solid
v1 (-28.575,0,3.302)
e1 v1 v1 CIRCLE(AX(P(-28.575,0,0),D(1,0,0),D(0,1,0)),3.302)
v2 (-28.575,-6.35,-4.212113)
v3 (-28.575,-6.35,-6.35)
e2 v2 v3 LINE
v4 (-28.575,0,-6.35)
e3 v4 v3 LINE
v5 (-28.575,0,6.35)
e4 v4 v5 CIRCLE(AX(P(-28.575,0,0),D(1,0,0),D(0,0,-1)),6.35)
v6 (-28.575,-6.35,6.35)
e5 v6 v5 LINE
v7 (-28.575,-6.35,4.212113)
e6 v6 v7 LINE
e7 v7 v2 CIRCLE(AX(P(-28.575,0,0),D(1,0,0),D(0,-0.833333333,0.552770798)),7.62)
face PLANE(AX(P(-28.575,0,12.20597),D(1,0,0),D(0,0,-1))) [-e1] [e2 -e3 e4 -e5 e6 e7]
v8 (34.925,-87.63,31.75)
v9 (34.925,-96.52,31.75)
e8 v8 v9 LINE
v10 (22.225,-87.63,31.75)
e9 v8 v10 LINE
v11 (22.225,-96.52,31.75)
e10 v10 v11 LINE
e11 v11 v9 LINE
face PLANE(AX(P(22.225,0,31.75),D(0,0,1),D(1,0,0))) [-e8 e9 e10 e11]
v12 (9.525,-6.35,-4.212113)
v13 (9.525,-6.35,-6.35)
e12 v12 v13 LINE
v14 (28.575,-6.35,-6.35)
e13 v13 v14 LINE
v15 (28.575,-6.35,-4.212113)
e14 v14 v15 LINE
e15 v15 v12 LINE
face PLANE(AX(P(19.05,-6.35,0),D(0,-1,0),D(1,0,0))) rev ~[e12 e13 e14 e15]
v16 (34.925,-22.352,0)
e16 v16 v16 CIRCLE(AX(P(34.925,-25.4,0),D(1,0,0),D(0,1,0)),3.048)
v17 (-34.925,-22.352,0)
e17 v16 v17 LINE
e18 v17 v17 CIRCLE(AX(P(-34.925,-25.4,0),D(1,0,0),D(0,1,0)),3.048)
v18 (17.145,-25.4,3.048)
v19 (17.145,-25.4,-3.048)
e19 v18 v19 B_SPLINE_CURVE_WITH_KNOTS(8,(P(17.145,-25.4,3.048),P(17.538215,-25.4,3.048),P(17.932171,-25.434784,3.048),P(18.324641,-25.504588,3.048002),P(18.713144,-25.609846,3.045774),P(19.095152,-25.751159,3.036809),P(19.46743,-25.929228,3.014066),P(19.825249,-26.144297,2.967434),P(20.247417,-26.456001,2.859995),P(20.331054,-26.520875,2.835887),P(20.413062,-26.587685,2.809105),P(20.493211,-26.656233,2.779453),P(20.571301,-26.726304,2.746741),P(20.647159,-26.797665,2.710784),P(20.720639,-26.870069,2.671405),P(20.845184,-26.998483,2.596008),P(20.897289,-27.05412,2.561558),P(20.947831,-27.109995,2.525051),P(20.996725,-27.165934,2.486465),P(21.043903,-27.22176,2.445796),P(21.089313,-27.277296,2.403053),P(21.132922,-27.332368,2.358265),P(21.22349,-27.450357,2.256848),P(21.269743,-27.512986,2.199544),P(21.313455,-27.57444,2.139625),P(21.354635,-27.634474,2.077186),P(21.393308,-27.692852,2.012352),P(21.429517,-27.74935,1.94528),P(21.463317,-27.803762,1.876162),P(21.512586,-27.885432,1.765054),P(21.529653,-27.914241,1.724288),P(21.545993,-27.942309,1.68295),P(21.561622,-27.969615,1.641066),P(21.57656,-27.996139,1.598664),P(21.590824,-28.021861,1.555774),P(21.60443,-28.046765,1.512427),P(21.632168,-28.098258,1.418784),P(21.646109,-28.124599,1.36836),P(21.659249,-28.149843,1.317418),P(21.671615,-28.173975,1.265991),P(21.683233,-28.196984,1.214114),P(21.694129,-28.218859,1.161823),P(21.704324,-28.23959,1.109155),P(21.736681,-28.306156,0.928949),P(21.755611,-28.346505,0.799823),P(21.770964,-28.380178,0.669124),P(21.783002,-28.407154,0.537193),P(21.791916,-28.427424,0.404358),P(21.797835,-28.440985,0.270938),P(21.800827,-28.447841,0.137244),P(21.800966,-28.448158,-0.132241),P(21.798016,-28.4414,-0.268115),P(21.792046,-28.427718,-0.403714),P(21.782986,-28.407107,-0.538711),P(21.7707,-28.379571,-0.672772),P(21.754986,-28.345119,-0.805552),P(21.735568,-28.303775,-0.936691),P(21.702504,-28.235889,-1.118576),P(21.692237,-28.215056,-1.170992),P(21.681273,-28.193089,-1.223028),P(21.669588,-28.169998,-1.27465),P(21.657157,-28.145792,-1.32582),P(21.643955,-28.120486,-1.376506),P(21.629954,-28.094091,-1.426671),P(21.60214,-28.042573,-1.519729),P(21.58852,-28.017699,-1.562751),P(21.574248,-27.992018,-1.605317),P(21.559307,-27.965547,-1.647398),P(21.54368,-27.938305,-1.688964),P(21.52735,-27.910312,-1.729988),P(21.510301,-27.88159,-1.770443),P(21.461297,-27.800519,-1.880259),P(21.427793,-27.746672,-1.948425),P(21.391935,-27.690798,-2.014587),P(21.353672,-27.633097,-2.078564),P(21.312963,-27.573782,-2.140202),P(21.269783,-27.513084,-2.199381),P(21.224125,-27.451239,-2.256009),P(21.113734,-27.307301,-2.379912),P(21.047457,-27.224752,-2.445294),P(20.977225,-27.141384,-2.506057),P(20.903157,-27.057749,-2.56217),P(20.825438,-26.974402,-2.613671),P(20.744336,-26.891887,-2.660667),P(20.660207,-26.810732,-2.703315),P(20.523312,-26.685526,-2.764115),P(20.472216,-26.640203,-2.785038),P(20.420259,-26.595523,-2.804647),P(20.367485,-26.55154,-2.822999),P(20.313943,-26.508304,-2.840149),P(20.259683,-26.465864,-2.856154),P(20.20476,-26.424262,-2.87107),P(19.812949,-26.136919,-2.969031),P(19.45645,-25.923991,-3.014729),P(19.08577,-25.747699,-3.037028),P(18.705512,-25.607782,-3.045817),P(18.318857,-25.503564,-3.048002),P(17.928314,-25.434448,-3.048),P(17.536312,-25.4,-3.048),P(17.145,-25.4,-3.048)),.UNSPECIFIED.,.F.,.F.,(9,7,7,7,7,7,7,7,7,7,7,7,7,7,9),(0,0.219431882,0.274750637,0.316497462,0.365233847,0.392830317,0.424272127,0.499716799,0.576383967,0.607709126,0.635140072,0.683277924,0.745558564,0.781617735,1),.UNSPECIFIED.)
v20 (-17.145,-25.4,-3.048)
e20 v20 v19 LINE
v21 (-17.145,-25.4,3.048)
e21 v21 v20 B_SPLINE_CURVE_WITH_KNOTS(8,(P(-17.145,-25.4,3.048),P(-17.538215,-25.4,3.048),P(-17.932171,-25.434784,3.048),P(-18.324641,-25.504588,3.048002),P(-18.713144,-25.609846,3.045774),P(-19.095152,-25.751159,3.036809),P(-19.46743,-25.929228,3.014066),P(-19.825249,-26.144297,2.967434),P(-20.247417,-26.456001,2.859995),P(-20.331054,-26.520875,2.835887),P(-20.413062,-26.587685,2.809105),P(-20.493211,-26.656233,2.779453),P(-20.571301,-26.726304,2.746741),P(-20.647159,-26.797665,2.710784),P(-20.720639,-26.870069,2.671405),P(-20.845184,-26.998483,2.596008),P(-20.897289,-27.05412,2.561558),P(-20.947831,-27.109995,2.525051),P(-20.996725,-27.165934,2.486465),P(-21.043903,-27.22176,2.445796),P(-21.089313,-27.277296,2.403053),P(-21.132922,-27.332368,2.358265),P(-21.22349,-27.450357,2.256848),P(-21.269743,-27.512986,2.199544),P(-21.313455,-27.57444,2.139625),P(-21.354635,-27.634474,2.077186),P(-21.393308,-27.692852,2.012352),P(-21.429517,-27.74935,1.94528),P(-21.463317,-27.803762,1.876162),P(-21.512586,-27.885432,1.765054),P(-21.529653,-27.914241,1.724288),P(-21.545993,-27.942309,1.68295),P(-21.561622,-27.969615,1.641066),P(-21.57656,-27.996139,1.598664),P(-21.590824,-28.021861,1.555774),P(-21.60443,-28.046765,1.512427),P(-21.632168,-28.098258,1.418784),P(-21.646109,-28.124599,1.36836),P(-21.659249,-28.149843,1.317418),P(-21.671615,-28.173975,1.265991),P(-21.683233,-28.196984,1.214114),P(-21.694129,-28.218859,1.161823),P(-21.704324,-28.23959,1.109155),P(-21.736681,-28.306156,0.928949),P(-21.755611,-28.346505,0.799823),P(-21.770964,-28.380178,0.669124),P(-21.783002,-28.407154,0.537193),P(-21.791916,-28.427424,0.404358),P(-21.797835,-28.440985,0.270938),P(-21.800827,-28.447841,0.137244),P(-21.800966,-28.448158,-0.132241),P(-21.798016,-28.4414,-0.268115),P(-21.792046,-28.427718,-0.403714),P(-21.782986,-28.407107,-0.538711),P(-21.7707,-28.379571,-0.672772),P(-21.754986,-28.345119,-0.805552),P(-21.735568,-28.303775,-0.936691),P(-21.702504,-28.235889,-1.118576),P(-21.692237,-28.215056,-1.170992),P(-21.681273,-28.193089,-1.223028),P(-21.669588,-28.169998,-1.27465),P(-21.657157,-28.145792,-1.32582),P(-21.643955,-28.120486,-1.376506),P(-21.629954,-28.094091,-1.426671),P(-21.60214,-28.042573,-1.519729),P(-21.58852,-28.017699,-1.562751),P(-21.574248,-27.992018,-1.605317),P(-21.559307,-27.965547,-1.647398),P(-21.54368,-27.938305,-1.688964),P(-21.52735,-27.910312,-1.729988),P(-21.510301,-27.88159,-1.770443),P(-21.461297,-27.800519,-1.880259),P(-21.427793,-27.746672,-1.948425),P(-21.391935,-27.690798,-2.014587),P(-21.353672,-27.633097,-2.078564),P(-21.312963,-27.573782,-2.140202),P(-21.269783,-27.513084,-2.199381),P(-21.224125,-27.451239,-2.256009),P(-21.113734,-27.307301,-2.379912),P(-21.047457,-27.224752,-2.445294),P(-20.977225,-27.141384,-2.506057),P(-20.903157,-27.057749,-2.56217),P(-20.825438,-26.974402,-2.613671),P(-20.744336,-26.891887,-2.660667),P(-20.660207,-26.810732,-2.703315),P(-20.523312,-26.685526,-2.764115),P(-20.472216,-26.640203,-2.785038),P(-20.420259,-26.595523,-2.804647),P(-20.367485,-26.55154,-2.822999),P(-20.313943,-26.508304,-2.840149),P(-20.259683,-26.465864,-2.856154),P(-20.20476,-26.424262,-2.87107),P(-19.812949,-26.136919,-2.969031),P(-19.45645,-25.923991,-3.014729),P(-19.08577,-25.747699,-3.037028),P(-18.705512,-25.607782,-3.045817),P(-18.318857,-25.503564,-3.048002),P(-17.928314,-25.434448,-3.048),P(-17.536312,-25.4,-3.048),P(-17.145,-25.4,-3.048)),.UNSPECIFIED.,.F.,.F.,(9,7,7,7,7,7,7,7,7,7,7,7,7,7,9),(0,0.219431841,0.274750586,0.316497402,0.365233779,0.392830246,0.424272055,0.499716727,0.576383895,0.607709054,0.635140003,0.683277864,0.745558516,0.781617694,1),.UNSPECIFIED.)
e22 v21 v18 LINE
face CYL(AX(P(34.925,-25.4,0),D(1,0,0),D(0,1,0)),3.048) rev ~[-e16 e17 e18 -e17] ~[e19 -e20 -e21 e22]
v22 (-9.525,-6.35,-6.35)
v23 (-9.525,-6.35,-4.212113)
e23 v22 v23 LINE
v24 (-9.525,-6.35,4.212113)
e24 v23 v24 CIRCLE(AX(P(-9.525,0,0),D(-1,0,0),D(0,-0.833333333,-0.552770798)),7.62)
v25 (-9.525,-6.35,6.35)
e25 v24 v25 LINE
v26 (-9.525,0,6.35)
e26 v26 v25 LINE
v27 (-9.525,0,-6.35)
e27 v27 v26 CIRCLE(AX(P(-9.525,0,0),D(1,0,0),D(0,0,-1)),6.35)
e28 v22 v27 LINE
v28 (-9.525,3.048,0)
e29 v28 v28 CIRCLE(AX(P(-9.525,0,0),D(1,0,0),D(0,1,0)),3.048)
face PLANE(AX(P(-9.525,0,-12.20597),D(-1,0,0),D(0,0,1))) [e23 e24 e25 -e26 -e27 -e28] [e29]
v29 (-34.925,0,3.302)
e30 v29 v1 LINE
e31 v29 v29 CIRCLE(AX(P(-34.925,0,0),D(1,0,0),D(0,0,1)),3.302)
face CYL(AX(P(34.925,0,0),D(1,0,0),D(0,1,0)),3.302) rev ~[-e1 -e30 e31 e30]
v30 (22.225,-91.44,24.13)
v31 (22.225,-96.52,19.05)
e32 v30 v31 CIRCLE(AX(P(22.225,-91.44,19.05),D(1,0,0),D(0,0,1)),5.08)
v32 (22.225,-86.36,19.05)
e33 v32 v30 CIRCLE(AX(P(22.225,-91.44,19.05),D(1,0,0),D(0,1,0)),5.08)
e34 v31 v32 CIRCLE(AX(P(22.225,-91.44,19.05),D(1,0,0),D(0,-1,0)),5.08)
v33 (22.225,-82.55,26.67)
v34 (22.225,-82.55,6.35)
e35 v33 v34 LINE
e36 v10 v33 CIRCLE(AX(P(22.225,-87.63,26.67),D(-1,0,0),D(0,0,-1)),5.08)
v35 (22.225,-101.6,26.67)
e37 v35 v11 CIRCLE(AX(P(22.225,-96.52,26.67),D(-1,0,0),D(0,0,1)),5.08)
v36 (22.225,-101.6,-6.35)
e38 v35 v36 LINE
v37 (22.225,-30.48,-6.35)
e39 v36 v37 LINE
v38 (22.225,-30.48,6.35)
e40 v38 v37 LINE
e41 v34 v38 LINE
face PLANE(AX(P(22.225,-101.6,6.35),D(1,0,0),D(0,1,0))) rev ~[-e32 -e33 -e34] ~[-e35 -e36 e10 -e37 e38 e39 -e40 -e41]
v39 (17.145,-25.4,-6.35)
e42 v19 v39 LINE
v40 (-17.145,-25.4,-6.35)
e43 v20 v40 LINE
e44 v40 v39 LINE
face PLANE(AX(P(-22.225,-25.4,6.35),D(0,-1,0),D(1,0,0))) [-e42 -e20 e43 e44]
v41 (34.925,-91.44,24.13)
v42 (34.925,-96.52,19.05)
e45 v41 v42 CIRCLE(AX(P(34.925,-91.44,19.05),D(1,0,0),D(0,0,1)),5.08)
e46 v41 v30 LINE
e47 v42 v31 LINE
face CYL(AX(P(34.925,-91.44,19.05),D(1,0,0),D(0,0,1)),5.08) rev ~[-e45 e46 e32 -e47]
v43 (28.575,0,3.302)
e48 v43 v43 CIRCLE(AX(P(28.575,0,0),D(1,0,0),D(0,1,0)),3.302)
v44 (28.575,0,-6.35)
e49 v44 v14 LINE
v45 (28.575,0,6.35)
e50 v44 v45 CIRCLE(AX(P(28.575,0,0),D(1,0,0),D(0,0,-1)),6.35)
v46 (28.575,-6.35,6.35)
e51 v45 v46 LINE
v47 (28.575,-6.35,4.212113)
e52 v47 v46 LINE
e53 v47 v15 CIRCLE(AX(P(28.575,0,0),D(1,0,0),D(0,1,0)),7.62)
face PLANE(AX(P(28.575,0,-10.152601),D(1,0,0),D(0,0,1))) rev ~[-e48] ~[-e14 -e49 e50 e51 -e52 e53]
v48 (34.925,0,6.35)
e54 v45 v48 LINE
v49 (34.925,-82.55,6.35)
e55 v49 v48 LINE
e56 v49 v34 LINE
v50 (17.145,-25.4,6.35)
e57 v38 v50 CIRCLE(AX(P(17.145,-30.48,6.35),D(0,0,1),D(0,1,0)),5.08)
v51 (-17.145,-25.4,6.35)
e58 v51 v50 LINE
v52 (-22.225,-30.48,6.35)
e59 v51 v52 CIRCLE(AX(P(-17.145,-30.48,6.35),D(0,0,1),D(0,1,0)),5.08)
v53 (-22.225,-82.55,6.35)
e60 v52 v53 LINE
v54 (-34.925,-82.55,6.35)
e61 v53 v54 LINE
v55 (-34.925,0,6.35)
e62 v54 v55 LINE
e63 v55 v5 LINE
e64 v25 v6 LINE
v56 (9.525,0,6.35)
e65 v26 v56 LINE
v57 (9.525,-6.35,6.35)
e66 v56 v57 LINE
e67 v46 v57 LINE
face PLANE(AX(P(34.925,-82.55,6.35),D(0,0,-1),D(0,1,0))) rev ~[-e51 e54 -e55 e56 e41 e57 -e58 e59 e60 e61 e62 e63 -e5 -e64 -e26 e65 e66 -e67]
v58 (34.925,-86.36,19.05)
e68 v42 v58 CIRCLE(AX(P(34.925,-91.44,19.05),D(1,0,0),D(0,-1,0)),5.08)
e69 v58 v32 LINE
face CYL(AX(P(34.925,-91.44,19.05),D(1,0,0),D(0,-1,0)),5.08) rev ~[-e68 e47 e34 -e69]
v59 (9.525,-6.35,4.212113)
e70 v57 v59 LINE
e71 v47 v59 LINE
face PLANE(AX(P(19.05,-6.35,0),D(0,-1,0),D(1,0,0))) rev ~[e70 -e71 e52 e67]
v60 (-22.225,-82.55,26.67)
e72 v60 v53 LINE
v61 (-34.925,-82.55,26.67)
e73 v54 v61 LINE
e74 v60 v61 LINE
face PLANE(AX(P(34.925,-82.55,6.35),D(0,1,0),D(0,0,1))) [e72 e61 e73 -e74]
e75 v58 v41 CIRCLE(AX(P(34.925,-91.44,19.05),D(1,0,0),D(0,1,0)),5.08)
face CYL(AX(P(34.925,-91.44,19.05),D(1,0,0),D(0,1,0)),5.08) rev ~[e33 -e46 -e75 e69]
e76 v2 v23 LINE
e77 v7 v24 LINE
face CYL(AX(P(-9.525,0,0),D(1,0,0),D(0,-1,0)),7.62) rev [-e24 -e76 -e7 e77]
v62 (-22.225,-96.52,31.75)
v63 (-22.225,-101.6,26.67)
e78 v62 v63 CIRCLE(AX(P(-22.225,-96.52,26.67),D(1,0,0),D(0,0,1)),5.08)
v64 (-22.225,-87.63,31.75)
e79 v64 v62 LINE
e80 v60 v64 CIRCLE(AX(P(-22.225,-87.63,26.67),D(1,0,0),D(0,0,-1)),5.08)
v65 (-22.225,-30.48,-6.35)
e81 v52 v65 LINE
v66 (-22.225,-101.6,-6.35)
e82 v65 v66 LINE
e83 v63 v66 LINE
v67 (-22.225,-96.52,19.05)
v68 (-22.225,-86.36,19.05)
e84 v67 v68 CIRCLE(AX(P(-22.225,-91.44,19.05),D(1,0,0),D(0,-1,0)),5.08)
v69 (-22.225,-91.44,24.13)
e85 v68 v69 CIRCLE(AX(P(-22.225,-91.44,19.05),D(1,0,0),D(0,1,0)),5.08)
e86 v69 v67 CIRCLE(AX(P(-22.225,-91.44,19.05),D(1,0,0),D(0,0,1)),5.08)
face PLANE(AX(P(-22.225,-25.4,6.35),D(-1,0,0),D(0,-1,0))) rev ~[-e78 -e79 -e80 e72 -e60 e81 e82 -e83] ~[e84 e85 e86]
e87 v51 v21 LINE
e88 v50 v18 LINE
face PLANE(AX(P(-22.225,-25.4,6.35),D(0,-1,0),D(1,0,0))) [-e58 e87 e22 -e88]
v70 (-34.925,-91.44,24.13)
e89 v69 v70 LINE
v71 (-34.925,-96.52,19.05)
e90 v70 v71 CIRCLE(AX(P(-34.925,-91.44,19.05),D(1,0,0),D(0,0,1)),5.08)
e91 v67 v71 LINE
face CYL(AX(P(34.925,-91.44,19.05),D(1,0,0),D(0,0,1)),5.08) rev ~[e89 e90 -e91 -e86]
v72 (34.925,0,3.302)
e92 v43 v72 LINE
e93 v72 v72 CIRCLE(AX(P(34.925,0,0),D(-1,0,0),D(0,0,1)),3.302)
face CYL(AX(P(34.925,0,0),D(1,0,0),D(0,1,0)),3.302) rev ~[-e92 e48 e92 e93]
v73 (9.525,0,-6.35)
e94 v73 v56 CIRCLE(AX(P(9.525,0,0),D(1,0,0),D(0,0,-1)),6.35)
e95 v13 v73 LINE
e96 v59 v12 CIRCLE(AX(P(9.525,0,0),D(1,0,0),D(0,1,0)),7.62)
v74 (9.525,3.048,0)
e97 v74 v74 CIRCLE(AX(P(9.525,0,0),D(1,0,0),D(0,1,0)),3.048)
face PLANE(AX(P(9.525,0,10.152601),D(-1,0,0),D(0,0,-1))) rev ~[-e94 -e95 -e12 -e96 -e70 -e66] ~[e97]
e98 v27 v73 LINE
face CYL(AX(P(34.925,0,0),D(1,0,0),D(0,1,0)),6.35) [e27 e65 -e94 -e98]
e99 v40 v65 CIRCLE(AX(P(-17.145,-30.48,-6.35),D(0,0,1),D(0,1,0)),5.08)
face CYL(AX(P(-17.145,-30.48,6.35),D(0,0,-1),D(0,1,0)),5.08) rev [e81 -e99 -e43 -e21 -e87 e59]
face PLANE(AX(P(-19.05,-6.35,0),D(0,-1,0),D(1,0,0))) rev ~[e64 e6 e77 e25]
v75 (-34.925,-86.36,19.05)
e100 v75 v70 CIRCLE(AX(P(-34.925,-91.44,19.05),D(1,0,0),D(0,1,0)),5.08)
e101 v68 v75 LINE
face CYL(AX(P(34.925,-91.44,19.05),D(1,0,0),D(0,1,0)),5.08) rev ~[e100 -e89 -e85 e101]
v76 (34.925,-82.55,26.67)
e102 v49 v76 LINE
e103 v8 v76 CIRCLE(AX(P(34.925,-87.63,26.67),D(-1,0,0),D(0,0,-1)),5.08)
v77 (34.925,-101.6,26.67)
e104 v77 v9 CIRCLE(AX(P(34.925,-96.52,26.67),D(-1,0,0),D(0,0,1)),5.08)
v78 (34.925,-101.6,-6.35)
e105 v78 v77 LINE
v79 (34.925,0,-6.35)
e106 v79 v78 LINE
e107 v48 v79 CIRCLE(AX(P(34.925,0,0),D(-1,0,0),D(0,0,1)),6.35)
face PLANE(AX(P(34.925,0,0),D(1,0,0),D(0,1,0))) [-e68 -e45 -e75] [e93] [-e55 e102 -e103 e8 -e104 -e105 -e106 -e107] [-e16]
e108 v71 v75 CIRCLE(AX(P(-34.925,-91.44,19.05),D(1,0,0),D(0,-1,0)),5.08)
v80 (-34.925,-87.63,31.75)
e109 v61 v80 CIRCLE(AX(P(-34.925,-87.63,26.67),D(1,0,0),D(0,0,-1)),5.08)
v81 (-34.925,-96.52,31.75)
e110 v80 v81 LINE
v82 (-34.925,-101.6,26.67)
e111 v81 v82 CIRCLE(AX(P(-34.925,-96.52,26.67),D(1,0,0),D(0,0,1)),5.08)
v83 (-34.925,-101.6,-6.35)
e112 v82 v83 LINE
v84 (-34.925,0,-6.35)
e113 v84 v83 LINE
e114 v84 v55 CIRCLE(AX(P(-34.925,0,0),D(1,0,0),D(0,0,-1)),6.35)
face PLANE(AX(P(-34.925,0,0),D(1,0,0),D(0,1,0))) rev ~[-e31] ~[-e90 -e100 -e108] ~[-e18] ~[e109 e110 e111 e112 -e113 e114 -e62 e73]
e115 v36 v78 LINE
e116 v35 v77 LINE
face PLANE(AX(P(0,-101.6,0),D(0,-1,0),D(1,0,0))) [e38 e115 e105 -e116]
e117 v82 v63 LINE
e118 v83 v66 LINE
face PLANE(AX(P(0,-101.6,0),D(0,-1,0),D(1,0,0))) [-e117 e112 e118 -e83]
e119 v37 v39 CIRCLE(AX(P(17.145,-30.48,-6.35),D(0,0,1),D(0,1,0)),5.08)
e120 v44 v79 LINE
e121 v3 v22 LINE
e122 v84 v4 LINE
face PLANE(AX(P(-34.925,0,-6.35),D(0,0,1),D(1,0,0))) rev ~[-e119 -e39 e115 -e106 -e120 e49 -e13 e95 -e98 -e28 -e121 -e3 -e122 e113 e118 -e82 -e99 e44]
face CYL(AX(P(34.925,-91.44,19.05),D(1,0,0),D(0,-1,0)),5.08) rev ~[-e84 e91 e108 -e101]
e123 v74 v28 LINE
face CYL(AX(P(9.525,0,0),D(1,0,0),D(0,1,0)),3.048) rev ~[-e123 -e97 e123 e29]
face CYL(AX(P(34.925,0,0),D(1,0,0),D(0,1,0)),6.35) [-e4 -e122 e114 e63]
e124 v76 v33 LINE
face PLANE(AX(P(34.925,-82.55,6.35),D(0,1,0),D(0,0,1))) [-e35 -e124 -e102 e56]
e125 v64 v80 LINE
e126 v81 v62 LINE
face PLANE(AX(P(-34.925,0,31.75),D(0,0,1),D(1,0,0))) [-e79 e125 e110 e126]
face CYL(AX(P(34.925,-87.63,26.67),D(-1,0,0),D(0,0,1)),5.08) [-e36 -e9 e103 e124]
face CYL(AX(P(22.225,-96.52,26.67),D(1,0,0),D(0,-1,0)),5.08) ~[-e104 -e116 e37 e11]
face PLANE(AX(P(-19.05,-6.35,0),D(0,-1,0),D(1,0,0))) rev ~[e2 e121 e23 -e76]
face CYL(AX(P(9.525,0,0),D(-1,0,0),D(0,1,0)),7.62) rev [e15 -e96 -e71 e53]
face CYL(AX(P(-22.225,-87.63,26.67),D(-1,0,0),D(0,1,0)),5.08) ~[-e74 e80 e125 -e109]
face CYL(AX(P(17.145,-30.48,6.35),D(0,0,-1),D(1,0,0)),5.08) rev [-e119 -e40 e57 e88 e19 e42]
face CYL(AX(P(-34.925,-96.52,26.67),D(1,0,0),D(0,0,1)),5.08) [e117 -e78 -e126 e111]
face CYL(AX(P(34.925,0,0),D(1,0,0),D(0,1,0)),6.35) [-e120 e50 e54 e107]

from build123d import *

# Parameters (mm, degrees)
F0_W      = 12.7
F0_H      = 25.4
F1_DEPTH  = 101.6
F2_W      = 82.55
F2_H      = 25.4
F3_DEPTH  = 69.851
F4_W      = 44.45
F4_H      = 50.8
F4_H_2    = 25.4
F5_DEPTH  = 25.4
F6_R      = 5.08
F7_R      = 6.35
F7_R_2    = 3.302
F8_DEPTH  = 69.85
F9_R      = 3.302
F10_DEPTH = 69.851
F12_DEPTH = 6.35
F13_R     = 4.8460610966
F13_R_2   = 3.048
F14_DEPTH = 19.05
F15_R     = 3.048
F16_DEPTH = 69.851
F18_R     = 7.62
F19_DEPTH = 19.05
F20_R     = 7.62
F21_DEPTH = 19.05


# Not quite as in the source:
# - two fillets or chamfers of one size are made in one step
# - a feature names something its author has since deleted; it is built from what else it names


with BuildPart() as f1:
    # F0 (on Front) → F1 (new body)
    with BuildSketch(Plane.XZ):
        Polygon((34.925, -6.35), (34.925, 6.35), (22.225, 6.35), (-22.225, 6.35), (-34.925, 6.35), (-34.925, -6.35), align=None)
        with Locations((28.575, 19.05)):
            Rectangle(F0_W, F0_H)
        with Locations((-28.575, 19.05)):
            Rectangle(F0_W, F0_H)
    extrude(amount=F1_DEPTH)

    # F2 (on face) → F3 (cut, through all)
    with BuildSketch(Plane.YZ.offset(34.925)):
        with Locations((-41.275, 19.05)):
            Rectangle(F2_W, F2_H)
        with BuildLine():
            ThreePointArc((-86.36, 19.05), (-87.8478975516, 22.6421024484), (-91.44, 24.13))
            Line((-91.44, 24.13), (-91.44, 19.05))
            Line((-91.44, 19.05), (-96.52, 19.05))
            ThreePointArc((-96.52, 19.05), (-91.44, 13.97), (-86.36, 19.05))
        make_face()
        with BuildLine():
            Line((-91.44, 19.05), (-91.44, 24.13))
            ThreePointArc((-91.44, 24.13), (-95.0321024484, 22.6421024484), (-96.52, 19.05))
            Line((-96.52, 19.05), (-91.44, 19.05))
        make_face()
    extrude(amount=-F3_DEPTH, mode=Mode.SUBTRACT)

    # F4 (on face) → F5 (cut)
    with BuildSketch(Plane.XY.offset(6.35)):
        with Locations((0, -50.8)):
            Rectangle(F4_W, F4_H)
        with Locations((0, -88.9)):
            Rectangle(F4_W, F4_H_2)
    extrude(amount=-F5_DEPTH, mode=Mode.SUBTRACT)

    # F6
    f6_edges = [f1.edges().sort_by_distance(p)[0] for p in [
        (-28.575, -101.6, 31.75),
        (-28.575, -82.55, 31.75),
        (28.575, -101.6, 31.75),
        (28.575, -82.55, 31.75),
        (22.225, -25.4, 0),
        (-22.225, -25.4, 0),
    ]]
    fillet(f6_edges, radius=F6_R)

    # F7 (on face) → F8 (join, through all)
    with BuildSketch(Plane.YZ.offset(34.925)):
        Circle(F7_R)
        Circle(F7_R_2, mode=Mode.SUBTRACT)
    extrude(amount=-F8_DEPTH)

    # F9 (on face) → F10 (cut, through all)
    with BuildSketch(Plane.YZ.offset(34.925)):
        Circle(F9_R)
    extrude(amount=-F10_DEPTH, mode=Mode.SUBTRACT)

    # F11 (on Front) → F12 (cut, symmetric)
    with BuildSketch(Plane.XZ):
        Polygon((-9.525, -12.2059704736), (-9.525, 0), (-9.525, 12.2059704736), (-28.575, 12.2059704736), (-28.575, -12.2059704736), align=None)
        Polygon((9.525, 10.1526007056), (9.525, 0), (9.525, -10.1526007056), (28.575, -10.1526007056), (28.575, 10.1526007056), align=None)
    extrude(amount=F12_DEPTH, both=True, mode=Mode.SUBTRACT)

    # F13 (on face) → F14 (join, through all)
    with BuildSketch(Plane.YZ.offset(9.525)):
        Circle(F13_R)
        Circle(F13_R_2, mode=Mode.SUBTRACT)
    extrude(amount=-F14_DEPTH)

    # F15 (on face) → F16 (cut, through all)
    with BuildSketch(Plane.YZ.offset(34.925)):
        with Locations((-25.4, 0)):
            Circle(F15_R)
    extrude(amount=-F16_DEPTH, mode=Mode.SUBTRACT)

    # F18 (on face) → F19 (cut, through all)
    with BuildSketch(Plane.YZ.offset(9.525)):
        Circle(F18_R)
    extrude(amount=F19_DEPTH, mode=Mode.SUBTRACT)

    # F20 (on face) → F21 (cut, through all)
    with BuildSketch(Plane(origin=(-9.525, 0, 0), x_dir=(0, -1, 0), z_dir=(-1, 0, 0))):
        Circle(F20_R)
    extrude(amount=F21_DEPTH, mode=Mode.SUBTRACT)


solid = f1.part
